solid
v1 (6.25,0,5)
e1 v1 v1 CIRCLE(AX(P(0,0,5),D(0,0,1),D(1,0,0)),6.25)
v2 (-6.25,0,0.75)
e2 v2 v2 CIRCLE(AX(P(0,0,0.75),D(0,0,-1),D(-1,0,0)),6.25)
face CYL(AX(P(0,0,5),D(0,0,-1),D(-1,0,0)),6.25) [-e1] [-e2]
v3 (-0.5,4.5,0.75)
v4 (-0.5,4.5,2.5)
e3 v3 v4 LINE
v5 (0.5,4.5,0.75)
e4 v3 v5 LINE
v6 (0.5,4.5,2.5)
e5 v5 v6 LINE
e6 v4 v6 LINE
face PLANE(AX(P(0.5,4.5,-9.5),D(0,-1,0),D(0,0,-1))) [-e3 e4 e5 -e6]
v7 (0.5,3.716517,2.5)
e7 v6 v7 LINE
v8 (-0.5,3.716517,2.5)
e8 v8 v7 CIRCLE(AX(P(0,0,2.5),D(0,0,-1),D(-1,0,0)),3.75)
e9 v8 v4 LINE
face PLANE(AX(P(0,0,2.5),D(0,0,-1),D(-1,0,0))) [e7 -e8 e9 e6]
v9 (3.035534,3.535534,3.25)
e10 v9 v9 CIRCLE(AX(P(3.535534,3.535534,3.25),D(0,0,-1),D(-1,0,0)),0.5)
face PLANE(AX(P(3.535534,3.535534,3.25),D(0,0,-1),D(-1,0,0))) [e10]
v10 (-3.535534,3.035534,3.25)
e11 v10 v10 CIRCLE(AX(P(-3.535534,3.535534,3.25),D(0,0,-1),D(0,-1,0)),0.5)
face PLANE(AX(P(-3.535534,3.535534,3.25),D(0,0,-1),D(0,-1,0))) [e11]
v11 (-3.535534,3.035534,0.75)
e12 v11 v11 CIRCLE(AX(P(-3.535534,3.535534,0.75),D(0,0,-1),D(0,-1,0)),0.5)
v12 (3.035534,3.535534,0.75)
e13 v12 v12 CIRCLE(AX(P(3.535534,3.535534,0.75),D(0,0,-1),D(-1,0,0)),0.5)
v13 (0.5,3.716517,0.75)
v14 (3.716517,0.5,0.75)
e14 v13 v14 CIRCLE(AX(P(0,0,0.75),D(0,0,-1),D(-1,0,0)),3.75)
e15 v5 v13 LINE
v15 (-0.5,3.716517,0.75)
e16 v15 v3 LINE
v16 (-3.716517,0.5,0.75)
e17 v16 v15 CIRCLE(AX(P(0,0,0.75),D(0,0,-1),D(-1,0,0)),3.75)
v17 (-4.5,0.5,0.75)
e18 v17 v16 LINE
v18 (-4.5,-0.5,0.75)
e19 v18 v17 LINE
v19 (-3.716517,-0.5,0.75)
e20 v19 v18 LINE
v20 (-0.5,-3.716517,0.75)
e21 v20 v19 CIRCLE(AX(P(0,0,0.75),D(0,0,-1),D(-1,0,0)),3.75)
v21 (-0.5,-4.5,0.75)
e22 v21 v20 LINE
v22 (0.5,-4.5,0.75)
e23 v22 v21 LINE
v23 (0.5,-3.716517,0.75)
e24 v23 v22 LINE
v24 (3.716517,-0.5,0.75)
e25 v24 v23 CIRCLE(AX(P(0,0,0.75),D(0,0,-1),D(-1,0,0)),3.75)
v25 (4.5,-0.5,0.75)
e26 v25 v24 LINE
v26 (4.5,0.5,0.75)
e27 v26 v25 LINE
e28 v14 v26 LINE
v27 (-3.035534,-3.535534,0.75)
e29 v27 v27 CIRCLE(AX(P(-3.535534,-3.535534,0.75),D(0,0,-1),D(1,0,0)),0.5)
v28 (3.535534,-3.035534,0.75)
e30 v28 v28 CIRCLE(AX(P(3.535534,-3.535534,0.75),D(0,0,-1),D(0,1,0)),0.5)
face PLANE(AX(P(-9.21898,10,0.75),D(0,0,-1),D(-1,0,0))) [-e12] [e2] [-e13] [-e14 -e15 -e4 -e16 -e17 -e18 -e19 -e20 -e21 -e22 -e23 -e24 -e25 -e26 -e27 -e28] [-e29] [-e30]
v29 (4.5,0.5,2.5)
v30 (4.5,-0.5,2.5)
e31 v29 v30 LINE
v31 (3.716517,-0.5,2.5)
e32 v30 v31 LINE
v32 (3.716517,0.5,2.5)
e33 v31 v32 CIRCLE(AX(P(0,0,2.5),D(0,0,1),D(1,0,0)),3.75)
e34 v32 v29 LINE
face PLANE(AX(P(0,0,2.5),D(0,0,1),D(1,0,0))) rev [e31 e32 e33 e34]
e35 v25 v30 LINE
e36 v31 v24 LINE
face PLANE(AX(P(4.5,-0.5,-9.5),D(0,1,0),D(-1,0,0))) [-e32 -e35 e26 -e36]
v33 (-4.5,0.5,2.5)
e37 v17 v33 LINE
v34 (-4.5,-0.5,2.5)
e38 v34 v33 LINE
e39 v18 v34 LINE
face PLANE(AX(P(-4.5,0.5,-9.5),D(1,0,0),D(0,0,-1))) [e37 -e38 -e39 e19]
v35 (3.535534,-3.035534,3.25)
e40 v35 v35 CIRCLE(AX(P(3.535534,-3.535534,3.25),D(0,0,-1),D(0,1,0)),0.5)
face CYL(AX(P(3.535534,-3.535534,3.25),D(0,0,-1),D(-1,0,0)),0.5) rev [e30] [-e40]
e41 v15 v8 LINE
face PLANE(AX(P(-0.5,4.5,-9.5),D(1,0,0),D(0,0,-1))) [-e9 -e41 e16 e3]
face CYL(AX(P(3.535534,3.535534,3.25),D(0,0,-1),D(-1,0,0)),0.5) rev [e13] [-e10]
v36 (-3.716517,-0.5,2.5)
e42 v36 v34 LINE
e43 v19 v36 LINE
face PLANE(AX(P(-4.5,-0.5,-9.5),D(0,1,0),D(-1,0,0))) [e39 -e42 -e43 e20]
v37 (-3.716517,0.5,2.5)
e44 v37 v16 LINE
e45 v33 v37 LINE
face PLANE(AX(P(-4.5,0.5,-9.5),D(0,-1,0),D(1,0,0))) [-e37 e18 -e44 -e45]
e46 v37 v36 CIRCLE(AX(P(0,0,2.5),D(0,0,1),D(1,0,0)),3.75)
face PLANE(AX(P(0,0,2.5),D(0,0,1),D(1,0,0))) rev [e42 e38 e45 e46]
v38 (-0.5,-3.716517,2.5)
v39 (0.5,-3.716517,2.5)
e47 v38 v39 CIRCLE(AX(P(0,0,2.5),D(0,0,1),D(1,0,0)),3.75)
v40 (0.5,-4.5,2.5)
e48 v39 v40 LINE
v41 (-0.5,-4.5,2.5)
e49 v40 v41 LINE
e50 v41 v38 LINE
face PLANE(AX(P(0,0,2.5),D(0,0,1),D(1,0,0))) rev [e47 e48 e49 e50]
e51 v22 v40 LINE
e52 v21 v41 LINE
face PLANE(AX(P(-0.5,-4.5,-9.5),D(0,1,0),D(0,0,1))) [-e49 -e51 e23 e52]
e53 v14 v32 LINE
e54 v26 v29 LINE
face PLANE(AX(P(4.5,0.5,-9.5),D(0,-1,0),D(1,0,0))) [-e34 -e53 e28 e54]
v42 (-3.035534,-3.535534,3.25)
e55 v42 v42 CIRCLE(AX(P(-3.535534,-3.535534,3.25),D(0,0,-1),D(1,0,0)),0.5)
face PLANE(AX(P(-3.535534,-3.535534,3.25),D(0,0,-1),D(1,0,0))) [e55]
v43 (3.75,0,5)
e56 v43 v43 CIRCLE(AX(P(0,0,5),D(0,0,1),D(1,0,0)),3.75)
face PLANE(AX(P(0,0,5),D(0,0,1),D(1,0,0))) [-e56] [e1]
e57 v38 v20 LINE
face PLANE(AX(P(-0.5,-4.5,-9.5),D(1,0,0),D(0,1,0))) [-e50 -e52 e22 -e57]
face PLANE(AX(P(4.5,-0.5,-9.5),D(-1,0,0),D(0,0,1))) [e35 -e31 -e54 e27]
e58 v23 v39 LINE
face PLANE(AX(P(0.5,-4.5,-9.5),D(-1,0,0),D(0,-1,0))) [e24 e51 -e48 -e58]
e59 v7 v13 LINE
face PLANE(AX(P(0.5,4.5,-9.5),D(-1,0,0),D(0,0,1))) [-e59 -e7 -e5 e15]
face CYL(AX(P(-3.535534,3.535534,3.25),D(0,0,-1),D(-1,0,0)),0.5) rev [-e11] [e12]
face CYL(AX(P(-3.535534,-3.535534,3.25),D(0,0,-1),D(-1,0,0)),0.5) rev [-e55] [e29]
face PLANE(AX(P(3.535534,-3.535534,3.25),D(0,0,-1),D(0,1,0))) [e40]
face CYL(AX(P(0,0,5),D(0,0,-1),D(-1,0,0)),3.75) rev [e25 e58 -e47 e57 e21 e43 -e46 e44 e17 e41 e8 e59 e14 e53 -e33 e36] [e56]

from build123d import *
from build123d.topology import SkipClean

# Parameters (mm, degrees)
SKETCH1_R               = 6.25
SKETCH1_R_2             = 3.75
BOSS_EXTRUDE1_DEPTH     = 5
BOSS_EXTRUDE2_START     = 3
SKETCH2_R               = 5.5
SKETCH2_R_2             = 3.75
BOSS_EXTRUDE2_DEPTH     = 3
THREAD1_PITCH           = 0.6
BOSS_EXTRUDE3_START     = 1.25
SKETCH7_R               = 5
SKETCH7_R_2             = 3.75
BOSS_EXTRUDE3_DEPTH     = 1.25
CUT_EXTRUDE3_DEPTH      = 6.5
CUT_EXTRUDE3_DEPTH_BACK = 5.5
SKETCH5_W               = 1
SKETCH5_H               = 1
BOSS_EXTRUDE4_START     = 0.5
SKETCH8_R               = 5
SKETCH8_R_2             = 3
BOSS_EXTRUDE4_DEPTH     = 0.5
CUT_EXTRUDE4_DEPTH      = 10
CUT_EXTRUDE4_DEPTH_BACK = 10
SKETCH9_W               = 18.419335543
SKETCH9_H               = 5.81075095
SKETCH10_R              = 0.5
CUT_EXTRUDE5_DEPTH      = 2.5
CIRPATTERN1_COUNT       = 4


with BuildPart() as part:
    # Sketch1 → Boss-Extrude1 (new body)
    with BuildSketch(Plane.XY):
        Circle(SKETCH1_R)
        Circle(SKETCH1_R_2, mode=Mode.SUBTRACT)
    extrude(amount=BOSS_EXTRUDE1_DEPTH)

    # Sketch2 → Boss-Extrude2 (add)
    with SkipClean():  # the faces are left unmerged after this step: merging them gives an invalid solid
        with BuildSketch(Plane(origin=(0, 0, 0), x_dir=(-1, 0, 0), z_dir=(0, 0, -1)).offset(BOSS_EXTRUDE2_START)):
            Circle(SKETCH2_R)
            Circle(SKETCH2_R_2, mode=Mode.SUBTRACT)
        extrude(amount=-BOSS_EXTRUDE2_DEPTH)

    # Thread1: the profile of Thread Profile1 profile screwed along a right-hand helix of 6.666667 turns, 6 arcs to a turn; built about Z, then put on its axis
    with SkipClean():  # the faces are left unmerged after this step: merging them gives an invalid solid
        thread1_z = Axis((0, 0, 0), (0, 0, 1))
        thread1_corners = [(5.5003, 0, -0.000173205), (5.5003, 0, 0.525173203), (5.175240475, 0, 0.337499999), (5.175240475, 0, 0.187499999)]
        with BuildLine(mode=Mode.PRIVATE) as thread1_profile:
            Line(thread1_corners[0], thread1_corners[1])
            Line(thread1_corners[1], thread1_corners[2])
            Line(thread1_corners[2], thread1_corners[3])
            Line(thread1_corners[3], thread1_corners[0])
        thread1_cap = Face(thread1_profile.wire())
        thread1_turn_angles = [0, 30, 60, 90, 120, 150, 180, 210, 240, 270, 300, 330, 360]
        thread1_turn_weights = [1, 0.8660254037844387, 1, 0.8660254037844387, 1, 0.8660254037844387, 1, 0.8660254037844387, 1, 0.8660254037844387, 1, 0.8660254037844387, 1]
        thread1_turn_rails = [Edge.make_bspline([Vector(p[0], p[1], 0).rotate(thread1_z, thread1_turn_angles[k]) / thread1_turn_weights[k] + Vector(0, 0, p[2] + THREAD1_PITCH * thread1_turn_angles[k] / 360) for k in range(13)], [0, 0, 0, 1, 1, 2, 2, 3, 3, 4, 4, 5, 5, 6, 6, 6], 2, thread1_turn_weights) for p in thread1_corners]
        thread1_turn_sides = [Face.make_surface_from_curves(thread1_turn_rails[p[0]], thread1_turn_rails[p[1]]) for p in [(0, 1), (1, 2), (2, 3), (3, 0)]]
        thread1_last_angles = [2160, 2190, 2220, 2250, 2280, 2310, 2340, 2370, 2400]
        thread1_last_weights = [1, 0.8660254037844387, 1, 0.8660254037844387, 1, 0.8660254037844387, 1, 0.8660254037844387, 1]
        thread1_last_rails = [Edge.make_bspline([Vector(p[0], p[1], 0).rotate(thread1_z, thread1_last_angles[k]) / thread1_last_weights[k] + Vector(0, 0, p[2] + THREAD1_PITCH * thread1_last_angles[k] / 360) for k in range(9)], [0, 0, 0, 1, 1, 2, 2, 3, 3, 4, 4, 4], 2, thread1_last_weights) for p in thread1_corners]
        thread1_last_sides = [Face.make_surface_from_curves(thread1_last_rails[p[0]], thread1_last_rails[p[1]]) for p in [(0, 1), (1, 2), (2, 3), (3, 0)]]
        thread1 = Plane(origin=(0, 0, -4), x_dir=(1, 0, 0), z_dir=(0, 0, 1)) * Solid(Shell([*[p.moved(Location((0, 0, THREAD1_PITCH * i))) for i in range(6) for p in thread1_turn_sides], *thread1_last_sides, thread1_cap, thread1_cap.rotate(thread1_z, 2400).moved(Location((0, 0, THREAD1_PITCH * 2400 / 360)))]))
        add(thread1, mode=Mode.SUBTRACT)

    # Sketch7 → Boss-Extrude3 (add)
    with SkipClean():  # the faces are left unmerged after this step: merging them gives an invalid solid
        with BuildSketch(Plane(origin=(0, 0, -3), x_dir=(-1, 0, 0), z_dir=(0, 0, -1)).offset(BOSS_EXTRUDE3_START)):
            Circle(SKETCH7_R)
            Circle(SKETCH7_R_2, mode=Mode.SUBTRACT)
        extrude(amount=-BOSS_EXTRUDE3_DEPTH)

    # Sketch5 → Cut-Extrude3 (cut, two sides: drawn at the far end of the back side and taken through both)
    with BuildSketch(Plane(origin=(0, 0, -3), x_dir=(-1, 0, 0), z_dir=(0, 0, -1)).offset(-CUT_EXTRUDE3_DEPTH_BACK)):
        with Locations((4, 0)):
            Rectangle(SKETCH5_W, SKETCH5_H)
        with Locations((0, 4)):
            Rectangle(SKETCH5_W, SKETCH5_H)
        with Locations((0, -4)):
            Rectangle(SKETCH5_W, SKETCH5_H)
        with Locations((-4, 0)):
            Rectangle(SKETCH5_W, SKETCH5_H)
    extrude(amount=CUT_EXTRUDE3_DEPTH + CUT_EXTRUDE3_DEPTH_BACK, mode=Mode.SUBTRACT)

    # Sketch8 → Boss-Extrude4 (add)
    with BuildSketch(Plane(origin=(0, 0, -4.25), x_dir=(-1, 0, 0), z_dir=(0, 0, -1)).offset(BOSS_EXTRUDE4_START)):
        Circle(SKETCH8_R)
        Circle(SKETCH8_R_2, mode=Mode.SUBTRACT)
    extrude(amount=-BOSS_EXTRUDE4_DEPTH)

    # Sketch9 → Cut-Extrude4 (cut, two sides: drawn at the far end of the back side and taken through both)
    with BuildSketch(Plane(origin=(0, 0, 0), x_dir=(1, 0, 0), z_dir=(0, 1, 0)).offset(-CUT_EXTRUDE4_DEPTH_BACK)):
        with Locations((-0.0093121, 2.155375475)):
            Rectangle(SKETCH9_W, SKETCH9_H)
    extrude(amount=CUT_EXTRUDE4_DEPTH + CUT_EXTRUDE4_DEPTH_BACK, mode=Mode.SUBTRACT)

    # Sketch10 → Cut-Extrude5 (cut)
    with BuildSketch(Plane(origin=(0, 0, 0.75), x_dir=(-1, 0, 0), z_dir=(0, 0, -1))):
        with Locations((-3.535533906, 3.535533906)):
            Circle(SKETCH10_R)
    cut_extrude5 = extrude(amount=-CUT_EXTRUDE5_DEPTH, mode=Mode.SUBTRACT)

    # CirPattern1: Cut-Extrude5 ×4 about axis
    cirpattern1_axis = Axis((0, 0, 0), (0, 0, 1))
    for i in range(1, CIRPATTERN1_COUNT):
        add(cut_extrude5.rotate(cirpattern1_axis, i * 360 / CIRPATTERN1_COUNT), mode=Mode.SUBTRACT)


solid = part.part
